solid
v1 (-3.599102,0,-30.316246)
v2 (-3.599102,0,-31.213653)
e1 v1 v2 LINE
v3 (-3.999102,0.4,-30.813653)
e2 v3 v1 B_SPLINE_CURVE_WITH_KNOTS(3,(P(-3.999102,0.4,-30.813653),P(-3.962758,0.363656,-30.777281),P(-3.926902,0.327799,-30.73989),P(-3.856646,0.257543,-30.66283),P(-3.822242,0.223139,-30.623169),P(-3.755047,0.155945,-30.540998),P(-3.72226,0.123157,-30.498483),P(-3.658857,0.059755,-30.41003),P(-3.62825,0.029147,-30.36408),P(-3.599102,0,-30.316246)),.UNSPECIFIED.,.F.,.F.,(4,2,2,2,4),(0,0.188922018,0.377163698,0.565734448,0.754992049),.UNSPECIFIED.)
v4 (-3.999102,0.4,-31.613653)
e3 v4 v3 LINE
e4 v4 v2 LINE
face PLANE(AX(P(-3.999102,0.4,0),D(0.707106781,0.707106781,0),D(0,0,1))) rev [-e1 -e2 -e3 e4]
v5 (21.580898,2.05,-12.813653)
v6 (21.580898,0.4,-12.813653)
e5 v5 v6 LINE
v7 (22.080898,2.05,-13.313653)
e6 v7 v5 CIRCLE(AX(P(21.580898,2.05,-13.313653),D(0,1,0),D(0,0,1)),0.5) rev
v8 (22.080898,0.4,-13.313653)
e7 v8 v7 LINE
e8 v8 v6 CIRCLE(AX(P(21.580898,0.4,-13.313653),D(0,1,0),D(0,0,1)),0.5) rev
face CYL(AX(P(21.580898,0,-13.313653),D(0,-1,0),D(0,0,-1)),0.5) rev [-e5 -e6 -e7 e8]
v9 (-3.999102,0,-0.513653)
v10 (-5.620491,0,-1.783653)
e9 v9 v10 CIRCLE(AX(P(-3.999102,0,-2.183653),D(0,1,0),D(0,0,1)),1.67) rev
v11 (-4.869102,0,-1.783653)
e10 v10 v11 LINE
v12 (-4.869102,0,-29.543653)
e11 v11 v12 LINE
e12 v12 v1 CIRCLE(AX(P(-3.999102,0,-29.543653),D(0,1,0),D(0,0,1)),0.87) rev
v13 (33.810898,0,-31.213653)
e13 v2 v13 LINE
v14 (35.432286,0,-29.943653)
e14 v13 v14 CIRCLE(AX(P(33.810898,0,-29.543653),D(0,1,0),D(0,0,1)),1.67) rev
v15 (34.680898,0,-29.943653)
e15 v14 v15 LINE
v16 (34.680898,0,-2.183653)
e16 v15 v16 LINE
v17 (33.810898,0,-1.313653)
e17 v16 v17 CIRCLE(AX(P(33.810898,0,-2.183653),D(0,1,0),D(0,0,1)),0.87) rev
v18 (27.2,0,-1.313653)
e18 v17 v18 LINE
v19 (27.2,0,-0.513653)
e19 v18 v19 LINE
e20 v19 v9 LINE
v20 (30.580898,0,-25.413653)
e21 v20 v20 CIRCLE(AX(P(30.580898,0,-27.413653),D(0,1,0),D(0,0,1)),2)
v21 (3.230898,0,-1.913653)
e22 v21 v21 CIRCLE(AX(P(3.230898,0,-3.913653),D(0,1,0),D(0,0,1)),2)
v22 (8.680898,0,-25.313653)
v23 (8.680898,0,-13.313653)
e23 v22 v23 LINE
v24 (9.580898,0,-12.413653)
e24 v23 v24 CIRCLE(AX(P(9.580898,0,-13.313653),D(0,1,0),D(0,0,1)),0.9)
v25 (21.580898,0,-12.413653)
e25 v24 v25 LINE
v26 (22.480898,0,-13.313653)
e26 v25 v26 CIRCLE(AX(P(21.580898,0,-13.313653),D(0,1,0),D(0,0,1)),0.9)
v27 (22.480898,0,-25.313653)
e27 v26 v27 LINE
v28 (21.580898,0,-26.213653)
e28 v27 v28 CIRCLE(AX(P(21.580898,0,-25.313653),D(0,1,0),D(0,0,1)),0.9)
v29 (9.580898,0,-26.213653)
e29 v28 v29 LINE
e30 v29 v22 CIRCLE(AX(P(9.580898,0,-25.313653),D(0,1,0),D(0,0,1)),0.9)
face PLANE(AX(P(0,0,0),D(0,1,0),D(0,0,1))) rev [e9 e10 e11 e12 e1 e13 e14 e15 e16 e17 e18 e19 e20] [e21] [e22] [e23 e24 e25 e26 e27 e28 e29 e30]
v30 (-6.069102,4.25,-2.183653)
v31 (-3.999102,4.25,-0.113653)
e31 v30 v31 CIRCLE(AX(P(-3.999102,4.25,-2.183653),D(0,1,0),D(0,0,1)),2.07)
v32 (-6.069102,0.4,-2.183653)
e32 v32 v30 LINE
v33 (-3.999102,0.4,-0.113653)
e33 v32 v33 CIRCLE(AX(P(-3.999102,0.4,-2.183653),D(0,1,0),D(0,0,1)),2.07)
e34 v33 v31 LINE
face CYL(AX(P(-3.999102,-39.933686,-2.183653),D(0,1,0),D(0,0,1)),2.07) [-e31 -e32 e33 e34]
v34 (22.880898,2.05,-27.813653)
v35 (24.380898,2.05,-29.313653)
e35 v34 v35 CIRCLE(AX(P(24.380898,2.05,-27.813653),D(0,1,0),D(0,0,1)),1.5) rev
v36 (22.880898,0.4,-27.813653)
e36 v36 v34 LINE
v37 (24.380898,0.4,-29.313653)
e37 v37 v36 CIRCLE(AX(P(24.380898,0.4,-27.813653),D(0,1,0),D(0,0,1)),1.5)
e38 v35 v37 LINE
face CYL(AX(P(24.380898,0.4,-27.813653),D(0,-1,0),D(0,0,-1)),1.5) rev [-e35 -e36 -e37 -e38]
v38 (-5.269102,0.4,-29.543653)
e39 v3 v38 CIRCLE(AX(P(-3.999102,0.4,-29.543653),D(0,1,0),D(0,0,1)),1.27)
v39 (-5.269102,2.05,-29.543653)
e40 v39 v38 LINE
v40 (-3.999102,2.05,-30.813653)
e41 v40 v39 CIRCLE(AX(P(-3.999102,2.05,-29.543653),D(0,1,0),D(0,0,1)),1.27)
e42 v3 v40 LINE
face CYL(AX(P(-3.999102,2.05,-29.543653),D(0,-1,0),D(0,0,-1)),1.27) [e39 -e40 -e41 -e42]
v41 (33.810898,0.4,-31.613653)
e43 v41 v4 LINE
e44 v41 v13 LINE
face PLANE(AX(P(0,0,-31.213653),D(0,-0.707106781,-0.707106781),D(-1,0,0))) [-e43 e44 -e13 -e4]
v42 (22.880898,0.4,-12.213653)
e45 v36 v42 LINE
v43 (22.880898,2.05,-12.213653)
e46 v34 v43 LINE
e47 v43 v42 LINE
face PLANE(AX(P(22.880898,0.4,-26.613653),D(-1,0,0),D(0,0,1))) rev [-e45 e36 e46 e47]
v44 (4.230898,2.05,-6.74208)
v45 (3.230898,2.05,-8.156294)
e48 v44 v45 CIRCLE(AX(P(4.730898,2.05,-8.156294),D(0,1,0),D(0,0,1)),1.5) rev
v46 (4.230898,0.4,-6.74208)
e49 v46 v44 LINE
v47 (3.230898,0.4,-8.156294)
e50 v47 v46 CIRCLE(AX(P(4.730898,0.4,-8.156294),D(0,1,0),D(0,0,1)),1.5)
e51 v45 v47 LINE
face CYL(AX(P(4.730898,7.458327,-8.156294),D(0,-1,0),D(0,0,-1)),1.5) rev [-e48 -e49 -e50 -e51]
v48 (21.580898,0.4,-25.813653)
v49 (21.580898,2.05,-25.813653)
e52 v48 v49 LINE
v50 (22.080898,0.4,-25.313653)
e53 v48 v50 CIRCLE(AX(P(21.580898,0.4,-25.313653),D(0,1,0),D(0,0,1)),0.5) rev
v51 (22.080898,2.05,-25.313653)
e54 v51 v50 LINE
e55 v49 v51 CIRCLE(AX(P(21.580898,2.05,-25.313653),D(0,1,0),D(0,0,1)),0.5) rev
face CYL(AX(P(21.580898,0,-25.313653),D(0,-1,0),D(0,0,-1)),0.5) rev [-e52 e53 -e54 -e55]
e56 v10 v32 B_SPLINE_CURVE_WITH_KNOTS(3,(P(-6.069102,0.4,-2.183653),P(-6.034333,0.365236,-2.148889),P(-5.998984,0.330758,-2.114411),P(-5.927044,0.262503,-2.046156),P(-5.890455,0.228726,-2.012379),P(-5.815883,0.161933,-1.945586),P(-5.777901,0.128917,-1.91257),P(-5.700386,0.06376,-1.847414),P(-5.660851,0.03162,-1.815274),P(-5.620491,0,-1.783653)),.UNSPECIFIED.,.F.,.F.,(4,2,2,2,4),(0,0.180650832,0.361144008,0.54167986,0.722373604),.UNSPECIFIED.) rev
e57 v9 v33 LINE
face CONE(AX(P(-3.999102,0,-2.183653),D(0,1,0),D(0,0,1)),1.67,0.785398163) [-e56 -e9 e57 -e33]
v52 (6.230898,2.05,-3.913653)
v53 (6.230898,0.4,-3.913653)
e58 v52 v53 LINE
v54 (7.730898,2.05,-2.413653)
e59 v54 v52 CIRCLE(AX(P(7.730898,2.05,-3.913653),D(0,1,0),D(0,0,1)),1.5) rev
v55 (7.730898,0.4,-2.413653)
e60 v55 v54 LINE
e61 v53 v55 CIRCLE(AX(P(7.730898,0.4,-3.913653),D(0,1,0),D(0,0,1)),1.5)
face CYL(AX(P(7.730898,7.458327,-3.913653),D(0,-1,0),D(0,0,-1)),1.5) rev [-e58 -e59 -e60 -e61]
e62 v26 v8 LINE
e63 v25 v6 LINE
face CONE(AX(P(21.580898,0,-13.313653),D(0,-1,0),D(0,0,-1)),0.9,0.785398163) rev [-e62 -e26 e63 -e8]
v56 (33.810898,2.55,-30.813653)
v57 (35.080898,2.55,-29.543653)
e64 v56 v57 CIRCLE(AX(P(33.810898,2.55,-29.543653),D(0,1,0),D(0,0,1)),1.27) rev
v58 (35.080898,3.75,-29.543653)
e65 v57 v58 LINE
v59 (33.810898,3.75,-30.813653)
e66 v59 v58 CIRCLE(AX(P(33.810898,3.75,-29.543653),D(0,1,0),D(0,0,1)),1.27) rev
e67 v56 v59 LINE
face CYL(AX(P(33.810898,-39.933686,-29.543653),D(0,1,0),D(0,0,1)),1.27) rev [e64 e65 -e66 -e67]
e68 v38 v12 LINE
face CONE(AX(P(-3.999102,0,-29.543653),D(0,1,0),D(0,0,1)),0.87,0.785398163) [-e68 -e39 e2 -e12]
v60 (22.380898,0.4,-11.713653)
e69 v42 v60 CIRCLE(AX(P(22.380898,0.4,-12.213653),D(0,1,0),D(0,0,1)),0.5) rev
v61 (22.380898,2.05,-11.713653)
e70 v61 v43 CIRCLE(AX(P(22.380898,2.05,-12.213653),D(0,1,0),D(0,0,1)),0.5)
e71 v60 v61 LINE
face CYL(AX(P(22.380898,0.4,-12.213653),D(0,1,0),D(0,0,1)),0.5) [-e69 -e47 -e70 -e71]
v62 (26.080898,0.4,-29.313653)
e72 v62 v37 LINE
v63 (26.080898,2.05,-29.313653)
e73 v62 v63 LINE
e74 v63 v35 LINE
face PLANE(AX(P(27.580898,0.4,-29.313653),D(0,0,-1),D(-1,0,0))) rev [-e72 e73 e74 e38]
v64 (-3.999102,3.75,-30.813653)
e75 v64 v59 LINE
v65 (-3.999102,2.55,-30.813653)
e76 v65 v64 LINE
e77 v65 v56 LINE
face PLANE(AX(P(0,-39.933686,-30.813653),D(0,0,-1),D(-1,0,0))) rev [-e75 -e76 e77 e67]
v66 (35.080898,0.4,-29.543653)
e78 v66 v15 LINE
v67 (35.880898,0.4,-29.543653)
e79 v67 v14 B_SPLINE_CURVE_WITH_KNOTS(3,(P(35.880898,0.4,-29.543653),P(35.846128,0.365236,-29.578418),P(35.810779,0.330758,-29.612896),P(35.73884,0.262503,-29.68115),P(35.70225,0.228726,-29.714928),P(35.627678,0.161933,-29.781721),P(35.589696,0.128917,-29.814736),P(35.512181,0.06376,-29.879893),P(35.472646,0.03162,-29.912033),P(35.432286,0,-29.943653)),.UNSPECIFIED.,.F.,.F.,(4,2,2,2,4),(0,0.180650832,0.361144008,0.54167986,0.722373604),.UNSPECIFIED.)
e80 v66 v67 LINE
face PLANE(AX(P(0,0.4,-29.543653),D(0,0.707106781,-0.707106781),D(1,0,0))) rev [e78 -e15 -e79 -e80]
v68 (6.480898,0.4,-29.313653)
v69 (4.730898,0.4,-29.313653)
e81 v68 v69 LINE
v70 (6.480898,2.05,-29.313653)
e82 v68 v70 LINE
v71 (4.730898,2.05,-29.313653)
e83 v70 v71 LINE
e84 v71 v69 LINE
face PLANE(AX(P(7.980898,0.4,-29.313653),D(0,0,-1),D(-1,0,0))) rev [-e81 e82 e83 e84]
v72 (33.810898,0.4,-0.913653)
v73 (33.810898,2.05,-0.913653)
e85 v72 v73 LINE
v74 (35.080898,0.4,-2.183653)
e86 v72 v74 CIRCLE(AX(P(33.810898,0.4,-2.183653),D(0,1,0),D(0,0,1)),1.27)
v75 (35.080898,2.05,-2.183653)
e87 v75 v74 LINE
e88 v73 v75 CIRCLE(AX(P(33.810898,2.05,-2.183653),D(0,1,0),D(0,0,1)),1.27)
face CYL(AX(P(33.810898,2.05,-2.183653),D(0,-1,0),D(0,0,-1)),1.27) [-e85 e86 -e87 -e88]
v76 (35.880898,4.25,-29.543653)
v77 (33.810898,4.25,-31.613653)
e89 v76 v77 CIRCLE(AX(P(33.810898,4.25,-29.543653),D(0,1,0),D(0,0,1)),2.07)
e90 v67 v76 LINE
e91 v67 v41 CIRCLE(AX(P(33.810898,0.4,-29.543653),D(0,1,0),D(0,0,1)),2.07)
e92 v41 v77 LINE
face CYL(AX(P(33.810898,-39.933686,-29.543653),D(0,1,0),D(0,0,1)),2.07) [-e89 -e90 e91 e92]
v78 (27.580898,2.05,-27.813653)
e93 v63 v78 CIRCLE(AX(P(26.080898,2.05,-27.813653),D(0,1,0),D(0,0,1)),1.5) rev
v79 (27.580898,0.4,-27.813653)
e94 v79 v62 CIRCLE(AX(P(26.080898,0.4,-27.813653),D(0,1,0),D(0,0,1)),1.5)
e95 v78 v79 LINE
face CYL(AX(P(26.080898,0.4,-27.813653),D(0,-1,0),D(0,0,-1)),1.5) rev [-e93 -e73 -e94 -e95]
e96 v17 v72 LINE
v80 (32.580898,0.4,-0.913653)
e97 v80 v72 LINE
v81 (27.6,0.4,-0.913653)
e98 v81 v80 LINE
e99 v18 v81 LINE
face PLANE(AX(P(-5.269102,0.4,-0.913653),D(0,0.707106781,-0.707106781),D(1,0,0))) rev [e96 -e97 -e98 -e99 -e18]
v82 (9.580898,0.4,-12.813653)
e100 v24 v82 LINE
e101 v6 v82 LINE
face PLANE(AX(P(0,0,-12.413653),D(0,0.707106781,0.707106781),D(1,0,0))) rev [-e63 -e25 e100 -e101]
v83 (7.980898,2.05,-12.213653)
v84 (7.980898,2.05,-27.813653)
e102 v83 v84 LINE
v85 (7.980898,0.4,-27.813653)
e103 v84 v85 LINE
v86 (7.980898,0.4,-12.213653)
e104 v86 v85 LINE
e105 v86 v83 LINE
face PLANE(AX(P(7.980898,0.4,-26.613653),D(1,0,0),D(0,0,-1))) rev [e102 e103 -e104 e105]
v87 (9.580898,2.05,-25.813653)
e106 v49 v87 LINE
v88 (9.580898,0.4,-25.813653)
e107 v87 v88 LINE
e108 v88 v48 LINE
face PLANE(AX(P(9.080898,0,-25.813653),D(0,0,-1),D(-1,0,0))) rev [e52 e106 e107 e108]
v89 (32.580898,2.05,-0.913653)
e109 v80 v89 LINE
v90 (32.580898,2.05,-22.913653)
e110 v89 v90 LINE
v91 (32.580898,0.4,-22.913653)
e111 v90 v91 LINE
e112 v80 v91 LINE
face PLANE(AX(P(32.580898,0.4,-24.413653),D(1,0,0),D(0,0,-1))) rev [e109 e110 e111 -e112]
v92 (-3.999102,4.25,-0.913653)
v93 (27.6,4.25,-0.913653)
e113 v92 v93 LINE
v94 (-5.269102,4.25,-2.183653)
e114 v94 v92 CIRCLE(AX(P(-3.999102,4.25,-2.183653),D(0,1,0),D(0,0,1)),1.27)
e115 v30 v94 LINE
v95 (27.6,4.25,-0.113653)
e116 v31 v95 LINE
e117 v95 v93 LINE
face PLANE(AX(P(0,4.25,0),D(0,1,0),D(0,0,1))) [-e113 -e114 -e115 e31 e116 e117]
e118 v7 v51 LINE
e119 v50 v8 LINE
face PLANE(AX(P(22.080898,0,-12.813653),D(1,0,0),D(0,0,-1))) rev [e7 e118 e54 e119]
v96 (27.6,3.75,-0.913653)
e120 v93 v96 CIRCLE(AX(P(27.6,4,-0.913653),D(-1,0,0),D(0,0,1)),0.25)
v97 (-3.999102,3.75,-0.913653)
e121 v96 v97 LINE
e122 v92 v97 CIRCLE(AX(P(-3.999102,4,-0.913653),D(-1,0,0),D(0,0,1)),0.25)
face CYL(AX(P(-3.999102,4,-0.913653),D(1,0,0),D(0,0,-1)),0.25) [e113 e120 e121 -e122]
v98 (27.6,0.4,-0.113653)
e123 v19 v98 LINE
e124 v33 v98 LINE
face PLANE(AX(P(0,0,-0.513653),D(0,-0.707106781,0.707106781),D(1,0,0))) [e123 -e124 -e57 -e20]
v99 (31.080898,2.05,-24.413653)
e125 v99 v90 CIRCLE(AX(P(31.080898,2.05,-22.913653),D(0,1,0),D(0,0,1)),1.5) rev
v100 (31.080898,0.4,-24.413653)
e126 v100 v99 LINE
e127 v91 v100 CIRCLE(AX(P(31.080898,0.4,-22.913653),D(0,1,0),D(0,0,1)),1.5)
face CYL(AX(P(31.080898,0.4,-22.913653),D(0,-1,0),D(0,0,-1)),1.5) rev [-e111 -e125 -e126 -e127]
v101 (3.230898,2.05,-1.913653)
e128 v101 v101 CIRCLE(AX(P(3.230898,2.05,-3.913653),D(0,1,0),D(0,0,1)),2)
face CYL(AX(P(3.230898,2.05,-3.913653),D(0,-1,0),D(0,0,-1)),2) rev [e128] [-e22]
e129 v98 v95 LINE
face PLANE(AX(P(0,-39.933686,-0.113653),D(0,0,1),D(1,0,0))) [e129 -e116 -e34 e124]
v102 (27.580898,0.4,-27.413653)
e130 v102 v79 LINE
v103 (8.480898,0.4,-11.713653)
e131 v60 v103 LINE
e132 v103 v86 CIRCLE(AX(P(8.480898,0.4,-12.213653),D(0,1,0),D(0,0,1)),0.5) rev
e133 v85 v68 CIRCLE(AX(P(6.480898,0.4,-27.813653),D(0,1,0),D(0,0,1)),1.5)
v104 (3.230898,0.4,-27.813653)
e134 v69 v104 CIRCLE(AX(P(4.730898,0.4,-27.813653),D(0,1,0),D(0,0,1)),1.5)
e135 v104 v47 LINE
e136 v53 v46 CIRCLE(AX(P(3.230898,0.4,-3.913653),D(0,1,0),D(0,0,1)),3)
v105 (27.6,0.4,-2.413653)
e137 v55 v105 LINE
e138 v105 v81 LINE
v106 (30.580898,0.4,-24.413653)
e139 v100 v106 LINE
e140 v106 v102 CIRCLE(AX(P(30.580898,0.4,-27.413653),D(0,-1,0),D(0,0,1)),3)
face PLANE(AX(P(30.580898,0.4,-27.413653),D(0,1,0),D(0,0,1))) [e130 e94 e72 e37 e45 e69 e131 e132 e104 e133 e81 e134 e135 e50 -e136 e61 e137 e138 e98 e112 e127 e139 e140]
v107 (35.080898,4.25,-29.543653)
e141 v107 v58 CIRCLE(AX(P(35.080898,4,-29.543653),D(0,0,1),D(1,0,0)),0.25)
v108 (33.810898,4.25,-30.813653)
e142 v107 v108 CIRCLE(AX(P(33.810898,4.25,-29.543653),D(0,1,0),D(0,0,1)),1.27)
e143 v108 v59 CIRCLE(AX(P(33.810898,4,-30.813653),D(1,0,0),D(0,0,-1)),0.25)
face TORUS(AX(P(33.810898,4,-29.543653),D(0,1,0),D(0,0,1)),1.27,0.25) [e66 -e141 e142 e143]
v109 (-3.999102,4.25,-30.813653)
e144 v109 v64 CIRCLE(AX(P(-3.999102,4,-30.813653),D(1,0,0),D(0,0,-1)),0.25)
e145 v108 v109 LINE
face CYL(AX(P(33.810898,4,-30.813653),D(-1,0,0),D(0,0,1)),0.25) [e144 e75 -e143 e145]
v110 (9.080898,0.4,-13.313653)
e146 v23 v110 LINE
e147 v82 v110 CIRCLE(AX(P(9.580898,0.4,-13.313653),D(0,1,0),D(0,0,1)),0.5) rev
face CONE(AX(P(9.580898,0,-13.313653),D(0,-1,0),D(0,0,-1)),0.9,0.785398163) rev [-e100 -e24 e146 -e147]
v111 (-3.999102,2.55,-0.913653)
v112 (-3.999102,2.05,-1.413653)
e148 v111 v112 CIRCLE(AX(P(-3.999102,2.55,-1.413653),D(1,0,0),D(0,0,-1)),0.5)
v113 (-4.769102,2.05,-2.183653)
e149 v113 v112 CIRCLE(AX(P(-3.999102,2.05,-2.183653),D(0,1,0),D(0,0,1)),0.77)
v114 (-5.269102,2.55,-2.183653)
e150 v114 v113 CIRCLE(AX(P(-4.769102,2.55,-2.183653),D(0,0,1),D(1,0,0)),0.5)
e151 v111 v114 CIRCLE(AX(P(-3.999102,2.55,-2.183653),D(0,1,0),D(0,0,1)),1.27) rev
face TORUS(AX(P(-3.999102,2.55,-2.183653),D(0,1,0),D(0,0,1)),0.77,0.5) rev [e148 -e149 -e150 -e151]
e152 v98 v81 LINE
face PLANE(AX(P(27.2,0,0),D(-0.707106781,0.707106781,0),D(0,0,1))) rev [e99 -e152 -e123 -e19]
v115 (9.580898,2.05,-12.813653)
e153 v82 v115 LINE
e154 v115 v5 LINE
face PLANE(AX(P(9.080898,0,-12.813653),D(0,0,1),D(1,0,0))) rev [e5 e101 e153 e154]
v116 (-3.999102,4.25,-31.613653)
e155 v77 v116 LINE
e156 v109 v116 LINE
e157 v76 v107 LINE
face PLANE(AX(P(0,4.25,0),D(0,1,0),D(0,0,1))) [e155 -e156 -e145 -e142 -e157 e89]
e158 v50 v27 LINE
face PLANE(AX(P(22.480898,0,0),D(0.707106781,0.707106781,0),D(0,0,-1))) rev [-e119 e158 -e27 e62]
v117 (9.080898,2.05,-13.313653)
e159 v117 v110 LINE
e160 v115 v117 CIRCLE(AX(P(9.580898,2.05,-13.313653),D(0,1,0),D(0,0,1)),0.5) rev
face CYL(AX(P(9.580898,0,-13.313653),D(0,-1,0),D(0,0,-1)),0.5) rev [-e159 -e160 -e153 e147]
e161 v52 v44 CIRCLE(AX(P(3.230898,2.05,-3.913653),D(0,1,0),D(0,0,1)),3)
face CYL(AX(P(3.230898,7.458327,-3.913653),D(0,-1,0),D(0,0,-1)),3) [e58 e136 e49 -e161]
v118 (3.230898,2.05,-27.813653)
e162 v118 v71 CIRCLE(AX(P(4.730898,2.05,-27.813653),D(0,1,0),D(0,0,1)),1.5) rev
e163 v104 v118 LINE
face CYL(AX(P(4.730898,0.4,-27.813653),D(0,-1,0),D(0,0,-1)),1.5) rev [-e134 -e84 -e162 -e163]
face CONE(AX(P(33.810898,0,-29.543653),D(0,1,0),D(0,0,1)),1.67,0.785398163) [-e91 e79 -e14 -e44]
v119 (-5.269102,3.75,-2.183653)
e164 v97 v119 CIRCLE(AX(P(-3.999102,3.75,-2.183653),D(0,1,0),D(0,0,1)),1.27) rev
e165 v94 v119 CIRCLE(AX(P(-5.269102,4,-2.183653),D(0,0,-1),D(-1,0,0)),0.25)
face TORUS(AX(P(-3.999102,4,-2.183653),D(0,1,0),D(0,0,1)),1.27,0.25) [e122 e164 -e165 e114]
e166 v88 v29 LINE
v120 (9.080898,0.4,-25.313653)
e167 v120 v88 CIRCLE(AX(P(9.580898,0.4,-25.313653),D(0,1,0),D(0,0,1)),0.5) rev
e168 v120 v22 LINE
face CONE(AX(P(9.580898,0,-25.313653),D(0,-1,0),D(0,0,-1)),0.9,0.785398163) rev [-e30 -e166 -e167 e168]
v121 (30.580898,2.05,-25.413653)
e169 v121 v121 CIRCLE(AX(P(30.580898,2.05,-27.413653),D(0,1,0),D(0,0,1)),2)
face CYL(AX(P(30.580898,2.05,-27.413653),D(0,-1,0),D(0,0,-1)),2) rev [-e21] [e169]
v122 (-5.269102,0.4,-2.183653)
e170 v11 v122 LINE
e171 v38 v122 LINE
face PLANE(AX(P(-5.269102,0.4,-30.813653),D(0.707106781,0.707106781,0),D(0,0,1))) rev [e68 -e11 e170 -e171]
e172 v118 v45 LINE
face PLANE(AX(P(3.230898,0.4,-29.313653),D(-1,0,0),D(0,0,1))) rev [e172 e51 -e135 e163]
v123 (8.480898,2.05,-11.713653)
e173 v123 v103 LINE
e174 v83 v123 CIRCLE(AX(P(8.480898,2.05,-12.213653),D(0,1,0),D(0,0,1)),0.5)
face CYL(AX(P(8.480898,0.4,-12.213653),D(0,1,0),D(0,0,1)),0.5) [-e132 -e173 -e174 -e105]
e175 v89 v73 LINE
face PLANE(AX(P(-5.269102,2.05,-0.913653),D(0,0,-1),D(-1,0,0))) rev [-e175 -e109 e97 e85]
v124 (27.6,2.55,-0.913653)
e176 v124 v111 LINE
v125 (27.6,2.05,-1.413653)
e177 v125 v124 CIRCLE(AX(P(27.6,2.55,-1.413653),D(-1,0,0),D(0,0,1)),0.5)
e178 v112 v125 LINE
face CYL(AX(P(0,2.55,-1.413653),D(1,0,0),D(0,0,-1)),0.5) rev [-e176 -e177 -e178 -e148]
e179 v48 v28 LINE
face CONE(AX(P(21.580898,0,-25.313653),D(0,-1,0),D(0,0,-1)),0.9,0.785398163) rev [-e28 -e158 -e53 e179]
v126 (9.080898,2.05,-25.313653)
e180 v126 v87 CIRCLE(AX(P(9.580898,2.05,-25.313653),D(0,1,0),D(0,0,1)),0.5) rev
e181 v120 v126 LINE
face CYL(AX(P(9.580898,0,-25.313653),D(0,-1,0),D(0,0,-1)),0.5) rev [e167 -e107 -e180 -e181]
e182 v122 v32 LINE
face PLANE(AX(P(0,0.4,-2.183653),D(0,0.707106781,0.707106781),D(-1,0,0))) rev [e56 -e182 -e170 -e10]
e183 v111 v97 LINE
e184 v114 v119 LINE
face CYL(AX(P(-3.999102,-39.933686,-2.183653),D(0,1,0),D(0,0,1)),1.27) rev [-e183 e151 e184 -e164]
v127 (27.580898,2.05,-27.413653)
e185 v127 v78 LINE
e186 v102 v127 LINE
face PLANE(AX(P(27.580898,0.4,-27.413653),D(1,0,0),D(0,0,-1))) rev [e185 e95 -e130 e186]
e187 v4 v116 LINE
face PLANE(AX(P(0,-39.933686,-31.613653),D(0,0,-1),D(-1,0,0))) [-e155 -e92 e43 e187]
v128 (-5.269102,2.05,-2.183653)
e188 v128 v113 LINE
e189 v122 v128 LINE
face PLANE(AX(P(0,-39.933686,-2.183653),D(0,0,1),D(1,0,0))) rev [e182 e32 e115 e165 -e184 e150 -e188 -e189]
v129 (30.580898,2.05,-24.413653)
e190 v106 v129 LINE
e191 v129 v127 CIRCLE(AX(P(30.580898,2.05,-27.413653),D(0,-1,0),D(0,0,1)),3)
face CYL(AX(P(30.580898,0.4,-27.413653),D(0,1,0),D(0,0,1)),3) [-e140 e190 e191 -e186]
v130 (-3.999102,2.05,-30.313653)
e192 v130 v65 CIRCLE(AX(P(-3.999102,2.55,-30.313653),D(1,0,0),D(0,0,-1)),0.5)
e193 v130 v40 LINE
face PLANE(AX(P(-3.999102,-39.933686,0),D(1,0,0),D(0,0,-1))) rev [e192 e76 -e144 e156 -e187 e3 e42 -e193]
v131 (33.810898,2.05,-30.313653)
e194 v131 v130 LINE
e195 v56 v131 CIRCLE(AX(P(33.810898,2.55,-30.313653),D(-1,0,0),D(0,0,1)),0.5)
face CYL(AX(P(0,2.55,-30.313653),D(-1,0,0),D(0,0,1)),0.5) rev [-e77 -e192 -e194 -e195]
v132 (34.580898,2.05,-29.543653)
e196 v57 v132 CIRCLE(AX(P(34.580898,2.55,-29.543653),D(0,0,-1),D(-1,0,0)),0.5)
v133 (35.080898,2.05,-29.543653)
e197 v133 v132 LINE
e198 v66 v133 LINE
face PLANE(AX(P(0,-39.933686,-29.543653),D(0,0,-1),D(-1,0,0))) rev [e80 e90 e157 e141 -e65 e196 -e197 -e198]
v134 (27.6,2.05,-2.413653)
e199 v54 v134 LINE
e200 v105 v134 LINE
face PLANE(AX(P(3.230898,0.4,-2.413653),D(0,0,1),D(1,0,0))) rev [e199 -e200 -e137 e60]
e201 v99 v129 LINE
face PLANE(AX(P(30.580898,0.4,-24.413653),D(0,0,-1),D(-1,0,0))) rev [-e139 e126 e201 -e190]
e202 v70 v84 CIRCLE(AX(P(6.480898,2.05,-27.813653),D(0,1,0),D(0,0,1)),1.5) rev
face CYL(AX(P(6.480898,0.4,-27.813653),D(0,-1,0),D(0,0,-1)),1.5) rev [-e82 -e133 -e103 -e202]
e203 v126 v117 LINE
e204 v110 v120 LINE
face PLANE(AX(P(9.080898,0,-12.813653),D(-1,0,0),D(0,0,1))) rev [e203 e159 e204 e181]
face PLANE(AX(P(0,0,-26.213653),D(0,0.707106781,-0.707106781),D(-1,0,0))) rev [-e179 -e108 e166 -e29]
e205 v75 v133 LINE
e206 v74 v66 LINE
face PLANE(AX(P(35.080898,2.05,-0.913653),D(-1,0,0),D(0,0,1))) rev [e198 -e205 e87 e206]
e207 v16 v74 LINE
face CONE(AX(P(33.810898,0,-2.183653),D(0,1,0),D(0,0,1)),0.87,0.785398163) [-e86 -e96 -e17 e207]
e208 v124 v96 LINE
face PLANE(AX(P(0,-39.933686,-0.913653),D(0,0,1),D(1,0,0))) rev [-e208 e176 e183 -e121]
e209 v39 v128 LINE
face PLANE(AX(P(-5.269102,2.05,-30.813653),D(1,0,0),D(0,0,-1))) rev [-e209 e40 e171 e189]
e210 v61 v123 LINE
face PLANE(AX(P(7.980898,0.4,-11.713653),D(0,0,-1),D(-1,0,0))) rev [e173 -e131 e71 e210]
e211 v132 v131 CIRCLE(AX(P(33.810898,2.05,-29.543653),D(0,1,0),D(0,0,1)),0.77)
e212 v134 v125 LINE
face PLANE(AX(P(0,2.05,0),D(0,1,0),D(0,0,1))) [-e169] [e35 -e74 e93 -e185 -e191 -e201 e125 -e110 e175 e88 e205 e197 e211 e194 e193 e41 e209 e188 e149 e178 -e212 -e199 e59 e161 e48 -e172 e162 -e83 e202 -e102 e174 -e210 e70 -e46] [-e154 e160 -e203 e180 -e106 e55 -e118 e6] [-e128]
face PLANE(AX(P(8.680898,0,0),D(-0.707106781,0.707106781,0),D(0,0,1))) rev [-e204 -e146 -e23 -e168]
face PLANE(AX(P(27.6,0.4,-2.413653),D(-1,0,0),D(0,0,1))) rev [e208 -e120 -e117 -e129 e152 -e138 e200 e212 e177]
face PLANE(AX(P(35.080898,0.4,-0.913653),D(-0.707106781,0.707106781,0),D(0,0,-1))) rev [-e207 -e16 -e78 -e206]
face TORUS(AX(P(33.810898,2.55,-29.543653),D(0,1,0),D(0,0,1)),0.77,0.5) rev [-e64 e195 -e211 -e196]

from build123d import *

# Parameters (mm, degrees)
CROQUIS1_W              = 40.35
CROQUIS1_H              = 29.9
CROQUIS1_R              = 2
SALIENTE_EXTRUIR1_DEPTH = 2.05
CORTAR_EXTRUIR2_DEPTH   = 1.65
CROQUIS3_W              = 13
CROQUIS3_H              = 13
CORTAR_EXTRUIR3_DEPTH   = 47.737063506
REDONDEO2_R             = 0.5
CHAFL_N1_SIZE           = 0.4
REDONDEO4_R             = 1.27
SALIENTE_EXTRUIR3_START = -2.05
SALIENTE_EXTRUIR3_DEPTH = 4.25
SALIENTE_EXTRUIR4_DEPTH = 1.65
CROQUIS9_R              = 0.25
CROQUIS11_R             = 0.25
REDONDEO6_R             = 1.5
REDONDEO7_R             = 0.5
REDONDEO8_R             = 0.5
CHAFL_N2_SIZE           = 0.4


# Some blends are built 0.0001 mm under size
with BuildPart() as part:
    # Croquis1 → Saliente-Extruir1 (new body)
    with BuildSketch(Plane(origin=(0, 0, 0), x_dir=(1, 0, 0), z_dir=(0, 1, 0))):
        with Locations((14.905897563, 15.863653327)):
            Rectangle(CROQUIS1_W, CROQUIS1_H)
        with Locations(Location((3.230897563, 3.913653327, 0), (0, 0, 270))):
            Circle(CROQUIS1_R, mode=Mode.SUBTRACT)
        with Locations(Location((30.580897563, 27.413653327, 0), (0, 0, 270))):
            Circle(CROQUIS1_R, mode=Mode.SUBTRACT)
    extrude(amount=SALIENTE_EXTRUIR1_DEPTH)

    # Croquis2 → Cortar-Extruir2 (cut)
    with BuildSketch(Plane(origin=(0, 2.05, 0), x_dir=(1, 0, 0), z_dir=(0, 1, 0))):
        with BuildLine():
            Line((27.580897563, 27.413653327), (27.580897563, 29.313653327))
            Line((27.580897563, 29.313653327), (22.880897563, 29.313653327))
            Line((22.880897563, 29.313653327), (22.880897563, 26.613653327))
            Line((22.880897563, 26.613653327), (22.880897563, 11.713653327))
            Line((22.880897563, 11.713653327), (7.980897563, 11.713653327))
            Line((7.980897563, 11.713653327), (7.980897563, 26.613653327))
            Line((7.980897563, 26.613653327), (7.980897563, 29.313653327))
            Line((7.980897563, 29.313653327), (3.230897563, 29.313653327))
            Line((3.230897563, 29.313653327), (3.230897563, 2.413653327))
            Line((3.230897563, 2.413653327), (27.6, 2.413653327))
            Line((27.6, 2.413653327), (27.6, 0.913653327))
            Line((27.6, 0.913653327), (32.580897563, 0.913653327))
            Line((32.580897563, 0.913653327), (32.580897563, 24.413653327))
            Line((32.580897563, 24.413653327), (30.580897563, 24.413653327))
            ThreePointArc((30.580897563, 24.413653327), (28.459577219, 25.292332983), (27.580897563, 27.413653327))
        make_face()
    extrude(amount=-CORTAR_EXTRUIR2_DEPTH, mode=Mode.SUBTRACT)

    # Croquis3 → Cortar-Extruir3 (cut, through all)
    with BuildSketch(Plane(origin=(0, 2.05, 0), x_dir=(1, 0, 0), z_dir=(0, 1, 0))):
        with Locations((15.580897563, 19.313653327)):
            Rectangle(CROQUIS3_W, CROQUIS3_H)
    extrude(amount=-CORTAR_EXTRUIR3_DEPTH, mode=Mode.SUBTRACT)

    # Redondeo2
    redondeo2_edges = [part.edges().sort_by_distance(p)[0] for p in [
        (9.080897563, 1.025, -12.813653327),
        (9.080897563, 1.025, -25.813653327),
        (22.080897563, 1.025, -25.813653327),
        (22.080897563, 1.025, -12.813653327),
    ]]
    fillet(redondeo2_edges, radius=REDONDEO2_R)

    # Chaflán1
    chafl_n1_edges = [part.edges().sort_by_distance(p)[0] for p in [
        (15.580897563, 0, -25.813653327),
        (22.080897563, 0, -19.313653327),
        (15.580897563, 0, -12.813653327),
        (9.080897563, 0, -19.313653327),
        (21.934450953, 0, -25.667206717),
        (21.934450953, 0, -12.960099936),
        (9.227344172, 0, -12.960099936),
        (9.227344172, 0, -25.667206717),
    ]]
    chamfer(chafl_n1_edges, length=CHAFL_N1_SIZE)

    # Redondeo4
    redondeo4_edges = [part.edges().sort_by_distance(p)[0] for p in [
        (-5.269102437, 1.025, -30.813653327),
        (35.080897563, 1.025, -30.813653327),
        (35.080897563, 1.025, -0.913653327),
        (-5.269102437, 1.025, -0.913653327),
    ]]
    fillet(redondeo4_edges, radius=REDONDEO4_R)

    # Croquis6 → Saliente-Extruir3 (add)
    with BuildSketch(Plane(origin=(0, 2.05, 0), x_dir=(1, 0, 0), z_dir=(0, 1, 0)).offset(SALIENTE_EXTRUIR3_START)):
        with BuildLine():
            Line((-3.999102437, 30.813653327), (33.810897563, 30.813653327))
            ThreePointArc((33.810897563, 30.813653327), (34.708923175, 30.441678939), (35.080897563, 29.543653327))
            Line((35.080897563, 29.543653327), (35.880897563, 29.543653327))
            ThreePointArc((35.880897563, 29.543653327), (35.2746086, 31.007364364), (33.810897563, 31.613653327))
            Line((33.810897563, 31.613653327), (-3.999102437, 31.613653327))
            Line((-3.999102437, 31.613653327), (-3.999102437, 30.813653327))
        make_face()
        with BuildLine():
            Line((27.6, 0.913653327), (-3.999102437, 0.913653327))
            ThreePointArc((-3.999102437, 0.913653327), (-4.89712805, 1.285627715), (-5.269102437, 2.183653327))
            Line((-5.269102437, 2.183653327), (-6.069102437, 2.183653327))
            ThreePointArc((-6.069102437, 2.183653327), (-5.462813475, 0.71994229), (-3.999102437, 0.113653327))
            Line((-3.999102437, 0.113653327), (27.6, 0.113653327))
            Line((27.6, 0.113653327), (27.6, 0.913653327))
        make_face()
    extrude(amount=SALIENTE_EXTRUIR3_DEPTH)

    # Croquis7 → Saliente-Extruir4 (add)
    with BuildSketch(Plane(origin=(0, 0.4, 0), x_dir=(1, 0, 0), z_dir=(0, 1, 0))):
        with BuildLine():
            ThreePointArc((6.230897563, 3.913653327), (5.352217906, 6.03497367), (3.230897563, 6.913653327))
            Line((3.230897563, 6.913653327), (3.230897563, 5.913653327))
            ThreePointArc((3.230897563, 5.913653327), (5.101726256, 4.620760108), (4.553773218, 2.413653327))
            Line((4.553773218, 2.413653327), (6.230897563, 2.413653327))
            Line((6.230897563, 2.413653327), (6.230897563, 3.913653327))
        make_face()
    extrude(amount=SALIENTE_EXTRUIR4_DEPTH)

    # Barrer1: sweep along a path in Croquis10
    with BuildLine(Plane(origin=(0, 4.25, 0), x_dir=(1, 0, 0), z_dir=(0, 1, 0))) as barrer1_path:
        Line((-3.999102437, 30.813653327), (33.810897563, 30.813653327))
        ThreePointArc((33.810897563, 30.813653327), (34.708923175, 30.441678939), (35.080897563, 29.543653327))
    # Croquis9 → Barrer1 (sweep)
    with BuildSketch(Plane.XY.offset(-29.543653327)):
        with Locations((35.080897563, 4)):
            Circle(CROQUIS9_R)
    sweep(path=barrer1_path.line)

    # Barrer2: sweep along a path in Croquis12
    with BuildLine(Plane(origin=(0, 4.25, 0), x_dir=(1, 0, 0), z_dir=(0, 1, 0))) as barrer2_path:
        Line((27.6, 0.913653327), (-3.999102437, 0.913653327))
        ThreePointArc((-3.999102437, 0.913653327), (-4.89712805, 1.285627715), (-5.269102437, 2.183653327))
    # Croquis11 → Barrer2 (sweep)
    with BuildSketch(Plane(origin=(0, 0, -2.183653327), x_dir=(-1, 0, 0), z_dir=(0, 0, -1))):
        with Locations((5.269102437, 4)):
            Circle(CROQUIS11_R)
    sweep(path=barrer2_path.line)

    # Redondeo6
    redondeo6_edges = [part.edges().sort_by_distance(p)[0] for p in [
        (3.230897563, 1.225, -6.913653327),
        (6.230897563, 1.225, -2.413653327),
        (3.230897563, 1.225, -29.313653327),
        (7.980897563, 1.225, -29.313653327),
        (22.880897563, 1.225, -29.313653327),
        (27.580897563, 1.225, -29.313653327),
        (32.580897563, 1.225, -24.413653327),
    ]]
    fillet(redondeo6_edges, radius=REDONDEO6_R - 0.0001)  # a hair under: the kernel refuses the full size

    # Redondeo7
    redondeo7_edges = [part.edges().sort_by_distance(p)[0] for p in [
        (7.980897563, 1.225, -11.713653327),
        (22.880897563, 1.225, -11.713653327),
    ]]
    fillet(redondeo7_edges, radius=REDONDEO7_R)

    # Redondeo8
    # the kernel refuses this fillet: 0.5 mm, written as the material it adds along each edge
    with BuildSketch(Plane(origin=(33.810897563, 2.05, -30.813653327), x_dir=(0, 0, 1), z_dir=(-1, 0, 0))) as redondeo8_piece_1:
        with BuildLine():
            CenterArc((REDONDEO8_R, REDONDEO8_R), REDONDEO8_R, 180, 90)
            Line((0, REDONDEO8_R), (0, 0))
            Line((0, 0), (REDONDEO8_R, 0))
        make_face()
    extrude(amount=37.81)
    with BuildSketch(Plane(origin=(-3.999102437, 2.05, -0.913653327), x_dir=(0, 0, -1), z_dir=(1, 0, 0))) as redondeo8_piece_2:
        with BuildLine():
            CenterArc((REDONDEO8_R, REDONDEO8_R), REDONDEO8_R, 180, 90)
            Line((0, REDONDEO8_R), (0, 0))
            Line((0, 0), (REDONDEO8_R, 0))
        make_face()
    extrude(amount=31.599102437)
    with BuildSketch(Plane(origin=(33.810897563, 2.05, -29.543653327), x_dir=(1, 0, 0), z_dir=(0, 0, 1))) as redondeo8_piece_3:
        with BuildLine():
            CenterArc((1.27 - REDONDEO8_R, REDONDEO8_R), REDONDEO8_R, 270, 90)
            Line((1.27, REDONDEO8_R), (1.27, 0))
            Line((1.27, 0), (1.27 - REDONDEO8_R, 0))
        make_face()
    revolve(axis=Axis((33.810897563, 2.05, -29.543653327), (0, 1, 0)), revolution_arc=90)
    with BuildSketch(Plane(origin=(-3.999102437, 2.05, -2.183653327), x_dir=(0, 0, 1), z_dir=(1, 0, 0))) as redondeo8_piece_4:
        with BuildLine():
            CenterArc((1.27 - REDONDEO8_R, -REDONDEO8_R), REDONDEO8_R, 0, 90)
            Line((1.27, -REDONDEO8_R), (1.27, 0))
            Line((1.27, 0), (1.27 - REDONDEO8_R, 0))
        make_face()
    revolve(axis=Axis((-3.999102437, 2.05, -2.183653327), (0, -1, 0)), revolution_arc=90)

    # Chaflán2
    chafl_n2_edges = [part.edges().sort_by_distance(p)[0] for p in [
        (-5.269102437, 0, -15.863653327),
        (-5.669102437, 0, -2.183653327),
        (-5.462813475, 0, -0.71994229),
        (11.800448781, 0, -0.113653327),
        (27.6, 0, -0.513653327),
        (30.705448781, 0, -0.913653327),
        (34.708923175, 0, -1.285627715),
        (35.080897563, 0, -15.863653327),
        (35.480897563, 0, -29.543653327),
        (35.2746086, 0, -31.007364364),
        (14.905897563, 0, -31.613653327),
        (-3.999102437, 0, -31.213653327),
        (-4.89712805, 0, -30.441678939),
    ]]
    chamfer(chafl_n2_edges, length=CHAFL_N2_SIZE - 0.0001)  # a hair under: the kernel refuses the full size


solid = part.part
